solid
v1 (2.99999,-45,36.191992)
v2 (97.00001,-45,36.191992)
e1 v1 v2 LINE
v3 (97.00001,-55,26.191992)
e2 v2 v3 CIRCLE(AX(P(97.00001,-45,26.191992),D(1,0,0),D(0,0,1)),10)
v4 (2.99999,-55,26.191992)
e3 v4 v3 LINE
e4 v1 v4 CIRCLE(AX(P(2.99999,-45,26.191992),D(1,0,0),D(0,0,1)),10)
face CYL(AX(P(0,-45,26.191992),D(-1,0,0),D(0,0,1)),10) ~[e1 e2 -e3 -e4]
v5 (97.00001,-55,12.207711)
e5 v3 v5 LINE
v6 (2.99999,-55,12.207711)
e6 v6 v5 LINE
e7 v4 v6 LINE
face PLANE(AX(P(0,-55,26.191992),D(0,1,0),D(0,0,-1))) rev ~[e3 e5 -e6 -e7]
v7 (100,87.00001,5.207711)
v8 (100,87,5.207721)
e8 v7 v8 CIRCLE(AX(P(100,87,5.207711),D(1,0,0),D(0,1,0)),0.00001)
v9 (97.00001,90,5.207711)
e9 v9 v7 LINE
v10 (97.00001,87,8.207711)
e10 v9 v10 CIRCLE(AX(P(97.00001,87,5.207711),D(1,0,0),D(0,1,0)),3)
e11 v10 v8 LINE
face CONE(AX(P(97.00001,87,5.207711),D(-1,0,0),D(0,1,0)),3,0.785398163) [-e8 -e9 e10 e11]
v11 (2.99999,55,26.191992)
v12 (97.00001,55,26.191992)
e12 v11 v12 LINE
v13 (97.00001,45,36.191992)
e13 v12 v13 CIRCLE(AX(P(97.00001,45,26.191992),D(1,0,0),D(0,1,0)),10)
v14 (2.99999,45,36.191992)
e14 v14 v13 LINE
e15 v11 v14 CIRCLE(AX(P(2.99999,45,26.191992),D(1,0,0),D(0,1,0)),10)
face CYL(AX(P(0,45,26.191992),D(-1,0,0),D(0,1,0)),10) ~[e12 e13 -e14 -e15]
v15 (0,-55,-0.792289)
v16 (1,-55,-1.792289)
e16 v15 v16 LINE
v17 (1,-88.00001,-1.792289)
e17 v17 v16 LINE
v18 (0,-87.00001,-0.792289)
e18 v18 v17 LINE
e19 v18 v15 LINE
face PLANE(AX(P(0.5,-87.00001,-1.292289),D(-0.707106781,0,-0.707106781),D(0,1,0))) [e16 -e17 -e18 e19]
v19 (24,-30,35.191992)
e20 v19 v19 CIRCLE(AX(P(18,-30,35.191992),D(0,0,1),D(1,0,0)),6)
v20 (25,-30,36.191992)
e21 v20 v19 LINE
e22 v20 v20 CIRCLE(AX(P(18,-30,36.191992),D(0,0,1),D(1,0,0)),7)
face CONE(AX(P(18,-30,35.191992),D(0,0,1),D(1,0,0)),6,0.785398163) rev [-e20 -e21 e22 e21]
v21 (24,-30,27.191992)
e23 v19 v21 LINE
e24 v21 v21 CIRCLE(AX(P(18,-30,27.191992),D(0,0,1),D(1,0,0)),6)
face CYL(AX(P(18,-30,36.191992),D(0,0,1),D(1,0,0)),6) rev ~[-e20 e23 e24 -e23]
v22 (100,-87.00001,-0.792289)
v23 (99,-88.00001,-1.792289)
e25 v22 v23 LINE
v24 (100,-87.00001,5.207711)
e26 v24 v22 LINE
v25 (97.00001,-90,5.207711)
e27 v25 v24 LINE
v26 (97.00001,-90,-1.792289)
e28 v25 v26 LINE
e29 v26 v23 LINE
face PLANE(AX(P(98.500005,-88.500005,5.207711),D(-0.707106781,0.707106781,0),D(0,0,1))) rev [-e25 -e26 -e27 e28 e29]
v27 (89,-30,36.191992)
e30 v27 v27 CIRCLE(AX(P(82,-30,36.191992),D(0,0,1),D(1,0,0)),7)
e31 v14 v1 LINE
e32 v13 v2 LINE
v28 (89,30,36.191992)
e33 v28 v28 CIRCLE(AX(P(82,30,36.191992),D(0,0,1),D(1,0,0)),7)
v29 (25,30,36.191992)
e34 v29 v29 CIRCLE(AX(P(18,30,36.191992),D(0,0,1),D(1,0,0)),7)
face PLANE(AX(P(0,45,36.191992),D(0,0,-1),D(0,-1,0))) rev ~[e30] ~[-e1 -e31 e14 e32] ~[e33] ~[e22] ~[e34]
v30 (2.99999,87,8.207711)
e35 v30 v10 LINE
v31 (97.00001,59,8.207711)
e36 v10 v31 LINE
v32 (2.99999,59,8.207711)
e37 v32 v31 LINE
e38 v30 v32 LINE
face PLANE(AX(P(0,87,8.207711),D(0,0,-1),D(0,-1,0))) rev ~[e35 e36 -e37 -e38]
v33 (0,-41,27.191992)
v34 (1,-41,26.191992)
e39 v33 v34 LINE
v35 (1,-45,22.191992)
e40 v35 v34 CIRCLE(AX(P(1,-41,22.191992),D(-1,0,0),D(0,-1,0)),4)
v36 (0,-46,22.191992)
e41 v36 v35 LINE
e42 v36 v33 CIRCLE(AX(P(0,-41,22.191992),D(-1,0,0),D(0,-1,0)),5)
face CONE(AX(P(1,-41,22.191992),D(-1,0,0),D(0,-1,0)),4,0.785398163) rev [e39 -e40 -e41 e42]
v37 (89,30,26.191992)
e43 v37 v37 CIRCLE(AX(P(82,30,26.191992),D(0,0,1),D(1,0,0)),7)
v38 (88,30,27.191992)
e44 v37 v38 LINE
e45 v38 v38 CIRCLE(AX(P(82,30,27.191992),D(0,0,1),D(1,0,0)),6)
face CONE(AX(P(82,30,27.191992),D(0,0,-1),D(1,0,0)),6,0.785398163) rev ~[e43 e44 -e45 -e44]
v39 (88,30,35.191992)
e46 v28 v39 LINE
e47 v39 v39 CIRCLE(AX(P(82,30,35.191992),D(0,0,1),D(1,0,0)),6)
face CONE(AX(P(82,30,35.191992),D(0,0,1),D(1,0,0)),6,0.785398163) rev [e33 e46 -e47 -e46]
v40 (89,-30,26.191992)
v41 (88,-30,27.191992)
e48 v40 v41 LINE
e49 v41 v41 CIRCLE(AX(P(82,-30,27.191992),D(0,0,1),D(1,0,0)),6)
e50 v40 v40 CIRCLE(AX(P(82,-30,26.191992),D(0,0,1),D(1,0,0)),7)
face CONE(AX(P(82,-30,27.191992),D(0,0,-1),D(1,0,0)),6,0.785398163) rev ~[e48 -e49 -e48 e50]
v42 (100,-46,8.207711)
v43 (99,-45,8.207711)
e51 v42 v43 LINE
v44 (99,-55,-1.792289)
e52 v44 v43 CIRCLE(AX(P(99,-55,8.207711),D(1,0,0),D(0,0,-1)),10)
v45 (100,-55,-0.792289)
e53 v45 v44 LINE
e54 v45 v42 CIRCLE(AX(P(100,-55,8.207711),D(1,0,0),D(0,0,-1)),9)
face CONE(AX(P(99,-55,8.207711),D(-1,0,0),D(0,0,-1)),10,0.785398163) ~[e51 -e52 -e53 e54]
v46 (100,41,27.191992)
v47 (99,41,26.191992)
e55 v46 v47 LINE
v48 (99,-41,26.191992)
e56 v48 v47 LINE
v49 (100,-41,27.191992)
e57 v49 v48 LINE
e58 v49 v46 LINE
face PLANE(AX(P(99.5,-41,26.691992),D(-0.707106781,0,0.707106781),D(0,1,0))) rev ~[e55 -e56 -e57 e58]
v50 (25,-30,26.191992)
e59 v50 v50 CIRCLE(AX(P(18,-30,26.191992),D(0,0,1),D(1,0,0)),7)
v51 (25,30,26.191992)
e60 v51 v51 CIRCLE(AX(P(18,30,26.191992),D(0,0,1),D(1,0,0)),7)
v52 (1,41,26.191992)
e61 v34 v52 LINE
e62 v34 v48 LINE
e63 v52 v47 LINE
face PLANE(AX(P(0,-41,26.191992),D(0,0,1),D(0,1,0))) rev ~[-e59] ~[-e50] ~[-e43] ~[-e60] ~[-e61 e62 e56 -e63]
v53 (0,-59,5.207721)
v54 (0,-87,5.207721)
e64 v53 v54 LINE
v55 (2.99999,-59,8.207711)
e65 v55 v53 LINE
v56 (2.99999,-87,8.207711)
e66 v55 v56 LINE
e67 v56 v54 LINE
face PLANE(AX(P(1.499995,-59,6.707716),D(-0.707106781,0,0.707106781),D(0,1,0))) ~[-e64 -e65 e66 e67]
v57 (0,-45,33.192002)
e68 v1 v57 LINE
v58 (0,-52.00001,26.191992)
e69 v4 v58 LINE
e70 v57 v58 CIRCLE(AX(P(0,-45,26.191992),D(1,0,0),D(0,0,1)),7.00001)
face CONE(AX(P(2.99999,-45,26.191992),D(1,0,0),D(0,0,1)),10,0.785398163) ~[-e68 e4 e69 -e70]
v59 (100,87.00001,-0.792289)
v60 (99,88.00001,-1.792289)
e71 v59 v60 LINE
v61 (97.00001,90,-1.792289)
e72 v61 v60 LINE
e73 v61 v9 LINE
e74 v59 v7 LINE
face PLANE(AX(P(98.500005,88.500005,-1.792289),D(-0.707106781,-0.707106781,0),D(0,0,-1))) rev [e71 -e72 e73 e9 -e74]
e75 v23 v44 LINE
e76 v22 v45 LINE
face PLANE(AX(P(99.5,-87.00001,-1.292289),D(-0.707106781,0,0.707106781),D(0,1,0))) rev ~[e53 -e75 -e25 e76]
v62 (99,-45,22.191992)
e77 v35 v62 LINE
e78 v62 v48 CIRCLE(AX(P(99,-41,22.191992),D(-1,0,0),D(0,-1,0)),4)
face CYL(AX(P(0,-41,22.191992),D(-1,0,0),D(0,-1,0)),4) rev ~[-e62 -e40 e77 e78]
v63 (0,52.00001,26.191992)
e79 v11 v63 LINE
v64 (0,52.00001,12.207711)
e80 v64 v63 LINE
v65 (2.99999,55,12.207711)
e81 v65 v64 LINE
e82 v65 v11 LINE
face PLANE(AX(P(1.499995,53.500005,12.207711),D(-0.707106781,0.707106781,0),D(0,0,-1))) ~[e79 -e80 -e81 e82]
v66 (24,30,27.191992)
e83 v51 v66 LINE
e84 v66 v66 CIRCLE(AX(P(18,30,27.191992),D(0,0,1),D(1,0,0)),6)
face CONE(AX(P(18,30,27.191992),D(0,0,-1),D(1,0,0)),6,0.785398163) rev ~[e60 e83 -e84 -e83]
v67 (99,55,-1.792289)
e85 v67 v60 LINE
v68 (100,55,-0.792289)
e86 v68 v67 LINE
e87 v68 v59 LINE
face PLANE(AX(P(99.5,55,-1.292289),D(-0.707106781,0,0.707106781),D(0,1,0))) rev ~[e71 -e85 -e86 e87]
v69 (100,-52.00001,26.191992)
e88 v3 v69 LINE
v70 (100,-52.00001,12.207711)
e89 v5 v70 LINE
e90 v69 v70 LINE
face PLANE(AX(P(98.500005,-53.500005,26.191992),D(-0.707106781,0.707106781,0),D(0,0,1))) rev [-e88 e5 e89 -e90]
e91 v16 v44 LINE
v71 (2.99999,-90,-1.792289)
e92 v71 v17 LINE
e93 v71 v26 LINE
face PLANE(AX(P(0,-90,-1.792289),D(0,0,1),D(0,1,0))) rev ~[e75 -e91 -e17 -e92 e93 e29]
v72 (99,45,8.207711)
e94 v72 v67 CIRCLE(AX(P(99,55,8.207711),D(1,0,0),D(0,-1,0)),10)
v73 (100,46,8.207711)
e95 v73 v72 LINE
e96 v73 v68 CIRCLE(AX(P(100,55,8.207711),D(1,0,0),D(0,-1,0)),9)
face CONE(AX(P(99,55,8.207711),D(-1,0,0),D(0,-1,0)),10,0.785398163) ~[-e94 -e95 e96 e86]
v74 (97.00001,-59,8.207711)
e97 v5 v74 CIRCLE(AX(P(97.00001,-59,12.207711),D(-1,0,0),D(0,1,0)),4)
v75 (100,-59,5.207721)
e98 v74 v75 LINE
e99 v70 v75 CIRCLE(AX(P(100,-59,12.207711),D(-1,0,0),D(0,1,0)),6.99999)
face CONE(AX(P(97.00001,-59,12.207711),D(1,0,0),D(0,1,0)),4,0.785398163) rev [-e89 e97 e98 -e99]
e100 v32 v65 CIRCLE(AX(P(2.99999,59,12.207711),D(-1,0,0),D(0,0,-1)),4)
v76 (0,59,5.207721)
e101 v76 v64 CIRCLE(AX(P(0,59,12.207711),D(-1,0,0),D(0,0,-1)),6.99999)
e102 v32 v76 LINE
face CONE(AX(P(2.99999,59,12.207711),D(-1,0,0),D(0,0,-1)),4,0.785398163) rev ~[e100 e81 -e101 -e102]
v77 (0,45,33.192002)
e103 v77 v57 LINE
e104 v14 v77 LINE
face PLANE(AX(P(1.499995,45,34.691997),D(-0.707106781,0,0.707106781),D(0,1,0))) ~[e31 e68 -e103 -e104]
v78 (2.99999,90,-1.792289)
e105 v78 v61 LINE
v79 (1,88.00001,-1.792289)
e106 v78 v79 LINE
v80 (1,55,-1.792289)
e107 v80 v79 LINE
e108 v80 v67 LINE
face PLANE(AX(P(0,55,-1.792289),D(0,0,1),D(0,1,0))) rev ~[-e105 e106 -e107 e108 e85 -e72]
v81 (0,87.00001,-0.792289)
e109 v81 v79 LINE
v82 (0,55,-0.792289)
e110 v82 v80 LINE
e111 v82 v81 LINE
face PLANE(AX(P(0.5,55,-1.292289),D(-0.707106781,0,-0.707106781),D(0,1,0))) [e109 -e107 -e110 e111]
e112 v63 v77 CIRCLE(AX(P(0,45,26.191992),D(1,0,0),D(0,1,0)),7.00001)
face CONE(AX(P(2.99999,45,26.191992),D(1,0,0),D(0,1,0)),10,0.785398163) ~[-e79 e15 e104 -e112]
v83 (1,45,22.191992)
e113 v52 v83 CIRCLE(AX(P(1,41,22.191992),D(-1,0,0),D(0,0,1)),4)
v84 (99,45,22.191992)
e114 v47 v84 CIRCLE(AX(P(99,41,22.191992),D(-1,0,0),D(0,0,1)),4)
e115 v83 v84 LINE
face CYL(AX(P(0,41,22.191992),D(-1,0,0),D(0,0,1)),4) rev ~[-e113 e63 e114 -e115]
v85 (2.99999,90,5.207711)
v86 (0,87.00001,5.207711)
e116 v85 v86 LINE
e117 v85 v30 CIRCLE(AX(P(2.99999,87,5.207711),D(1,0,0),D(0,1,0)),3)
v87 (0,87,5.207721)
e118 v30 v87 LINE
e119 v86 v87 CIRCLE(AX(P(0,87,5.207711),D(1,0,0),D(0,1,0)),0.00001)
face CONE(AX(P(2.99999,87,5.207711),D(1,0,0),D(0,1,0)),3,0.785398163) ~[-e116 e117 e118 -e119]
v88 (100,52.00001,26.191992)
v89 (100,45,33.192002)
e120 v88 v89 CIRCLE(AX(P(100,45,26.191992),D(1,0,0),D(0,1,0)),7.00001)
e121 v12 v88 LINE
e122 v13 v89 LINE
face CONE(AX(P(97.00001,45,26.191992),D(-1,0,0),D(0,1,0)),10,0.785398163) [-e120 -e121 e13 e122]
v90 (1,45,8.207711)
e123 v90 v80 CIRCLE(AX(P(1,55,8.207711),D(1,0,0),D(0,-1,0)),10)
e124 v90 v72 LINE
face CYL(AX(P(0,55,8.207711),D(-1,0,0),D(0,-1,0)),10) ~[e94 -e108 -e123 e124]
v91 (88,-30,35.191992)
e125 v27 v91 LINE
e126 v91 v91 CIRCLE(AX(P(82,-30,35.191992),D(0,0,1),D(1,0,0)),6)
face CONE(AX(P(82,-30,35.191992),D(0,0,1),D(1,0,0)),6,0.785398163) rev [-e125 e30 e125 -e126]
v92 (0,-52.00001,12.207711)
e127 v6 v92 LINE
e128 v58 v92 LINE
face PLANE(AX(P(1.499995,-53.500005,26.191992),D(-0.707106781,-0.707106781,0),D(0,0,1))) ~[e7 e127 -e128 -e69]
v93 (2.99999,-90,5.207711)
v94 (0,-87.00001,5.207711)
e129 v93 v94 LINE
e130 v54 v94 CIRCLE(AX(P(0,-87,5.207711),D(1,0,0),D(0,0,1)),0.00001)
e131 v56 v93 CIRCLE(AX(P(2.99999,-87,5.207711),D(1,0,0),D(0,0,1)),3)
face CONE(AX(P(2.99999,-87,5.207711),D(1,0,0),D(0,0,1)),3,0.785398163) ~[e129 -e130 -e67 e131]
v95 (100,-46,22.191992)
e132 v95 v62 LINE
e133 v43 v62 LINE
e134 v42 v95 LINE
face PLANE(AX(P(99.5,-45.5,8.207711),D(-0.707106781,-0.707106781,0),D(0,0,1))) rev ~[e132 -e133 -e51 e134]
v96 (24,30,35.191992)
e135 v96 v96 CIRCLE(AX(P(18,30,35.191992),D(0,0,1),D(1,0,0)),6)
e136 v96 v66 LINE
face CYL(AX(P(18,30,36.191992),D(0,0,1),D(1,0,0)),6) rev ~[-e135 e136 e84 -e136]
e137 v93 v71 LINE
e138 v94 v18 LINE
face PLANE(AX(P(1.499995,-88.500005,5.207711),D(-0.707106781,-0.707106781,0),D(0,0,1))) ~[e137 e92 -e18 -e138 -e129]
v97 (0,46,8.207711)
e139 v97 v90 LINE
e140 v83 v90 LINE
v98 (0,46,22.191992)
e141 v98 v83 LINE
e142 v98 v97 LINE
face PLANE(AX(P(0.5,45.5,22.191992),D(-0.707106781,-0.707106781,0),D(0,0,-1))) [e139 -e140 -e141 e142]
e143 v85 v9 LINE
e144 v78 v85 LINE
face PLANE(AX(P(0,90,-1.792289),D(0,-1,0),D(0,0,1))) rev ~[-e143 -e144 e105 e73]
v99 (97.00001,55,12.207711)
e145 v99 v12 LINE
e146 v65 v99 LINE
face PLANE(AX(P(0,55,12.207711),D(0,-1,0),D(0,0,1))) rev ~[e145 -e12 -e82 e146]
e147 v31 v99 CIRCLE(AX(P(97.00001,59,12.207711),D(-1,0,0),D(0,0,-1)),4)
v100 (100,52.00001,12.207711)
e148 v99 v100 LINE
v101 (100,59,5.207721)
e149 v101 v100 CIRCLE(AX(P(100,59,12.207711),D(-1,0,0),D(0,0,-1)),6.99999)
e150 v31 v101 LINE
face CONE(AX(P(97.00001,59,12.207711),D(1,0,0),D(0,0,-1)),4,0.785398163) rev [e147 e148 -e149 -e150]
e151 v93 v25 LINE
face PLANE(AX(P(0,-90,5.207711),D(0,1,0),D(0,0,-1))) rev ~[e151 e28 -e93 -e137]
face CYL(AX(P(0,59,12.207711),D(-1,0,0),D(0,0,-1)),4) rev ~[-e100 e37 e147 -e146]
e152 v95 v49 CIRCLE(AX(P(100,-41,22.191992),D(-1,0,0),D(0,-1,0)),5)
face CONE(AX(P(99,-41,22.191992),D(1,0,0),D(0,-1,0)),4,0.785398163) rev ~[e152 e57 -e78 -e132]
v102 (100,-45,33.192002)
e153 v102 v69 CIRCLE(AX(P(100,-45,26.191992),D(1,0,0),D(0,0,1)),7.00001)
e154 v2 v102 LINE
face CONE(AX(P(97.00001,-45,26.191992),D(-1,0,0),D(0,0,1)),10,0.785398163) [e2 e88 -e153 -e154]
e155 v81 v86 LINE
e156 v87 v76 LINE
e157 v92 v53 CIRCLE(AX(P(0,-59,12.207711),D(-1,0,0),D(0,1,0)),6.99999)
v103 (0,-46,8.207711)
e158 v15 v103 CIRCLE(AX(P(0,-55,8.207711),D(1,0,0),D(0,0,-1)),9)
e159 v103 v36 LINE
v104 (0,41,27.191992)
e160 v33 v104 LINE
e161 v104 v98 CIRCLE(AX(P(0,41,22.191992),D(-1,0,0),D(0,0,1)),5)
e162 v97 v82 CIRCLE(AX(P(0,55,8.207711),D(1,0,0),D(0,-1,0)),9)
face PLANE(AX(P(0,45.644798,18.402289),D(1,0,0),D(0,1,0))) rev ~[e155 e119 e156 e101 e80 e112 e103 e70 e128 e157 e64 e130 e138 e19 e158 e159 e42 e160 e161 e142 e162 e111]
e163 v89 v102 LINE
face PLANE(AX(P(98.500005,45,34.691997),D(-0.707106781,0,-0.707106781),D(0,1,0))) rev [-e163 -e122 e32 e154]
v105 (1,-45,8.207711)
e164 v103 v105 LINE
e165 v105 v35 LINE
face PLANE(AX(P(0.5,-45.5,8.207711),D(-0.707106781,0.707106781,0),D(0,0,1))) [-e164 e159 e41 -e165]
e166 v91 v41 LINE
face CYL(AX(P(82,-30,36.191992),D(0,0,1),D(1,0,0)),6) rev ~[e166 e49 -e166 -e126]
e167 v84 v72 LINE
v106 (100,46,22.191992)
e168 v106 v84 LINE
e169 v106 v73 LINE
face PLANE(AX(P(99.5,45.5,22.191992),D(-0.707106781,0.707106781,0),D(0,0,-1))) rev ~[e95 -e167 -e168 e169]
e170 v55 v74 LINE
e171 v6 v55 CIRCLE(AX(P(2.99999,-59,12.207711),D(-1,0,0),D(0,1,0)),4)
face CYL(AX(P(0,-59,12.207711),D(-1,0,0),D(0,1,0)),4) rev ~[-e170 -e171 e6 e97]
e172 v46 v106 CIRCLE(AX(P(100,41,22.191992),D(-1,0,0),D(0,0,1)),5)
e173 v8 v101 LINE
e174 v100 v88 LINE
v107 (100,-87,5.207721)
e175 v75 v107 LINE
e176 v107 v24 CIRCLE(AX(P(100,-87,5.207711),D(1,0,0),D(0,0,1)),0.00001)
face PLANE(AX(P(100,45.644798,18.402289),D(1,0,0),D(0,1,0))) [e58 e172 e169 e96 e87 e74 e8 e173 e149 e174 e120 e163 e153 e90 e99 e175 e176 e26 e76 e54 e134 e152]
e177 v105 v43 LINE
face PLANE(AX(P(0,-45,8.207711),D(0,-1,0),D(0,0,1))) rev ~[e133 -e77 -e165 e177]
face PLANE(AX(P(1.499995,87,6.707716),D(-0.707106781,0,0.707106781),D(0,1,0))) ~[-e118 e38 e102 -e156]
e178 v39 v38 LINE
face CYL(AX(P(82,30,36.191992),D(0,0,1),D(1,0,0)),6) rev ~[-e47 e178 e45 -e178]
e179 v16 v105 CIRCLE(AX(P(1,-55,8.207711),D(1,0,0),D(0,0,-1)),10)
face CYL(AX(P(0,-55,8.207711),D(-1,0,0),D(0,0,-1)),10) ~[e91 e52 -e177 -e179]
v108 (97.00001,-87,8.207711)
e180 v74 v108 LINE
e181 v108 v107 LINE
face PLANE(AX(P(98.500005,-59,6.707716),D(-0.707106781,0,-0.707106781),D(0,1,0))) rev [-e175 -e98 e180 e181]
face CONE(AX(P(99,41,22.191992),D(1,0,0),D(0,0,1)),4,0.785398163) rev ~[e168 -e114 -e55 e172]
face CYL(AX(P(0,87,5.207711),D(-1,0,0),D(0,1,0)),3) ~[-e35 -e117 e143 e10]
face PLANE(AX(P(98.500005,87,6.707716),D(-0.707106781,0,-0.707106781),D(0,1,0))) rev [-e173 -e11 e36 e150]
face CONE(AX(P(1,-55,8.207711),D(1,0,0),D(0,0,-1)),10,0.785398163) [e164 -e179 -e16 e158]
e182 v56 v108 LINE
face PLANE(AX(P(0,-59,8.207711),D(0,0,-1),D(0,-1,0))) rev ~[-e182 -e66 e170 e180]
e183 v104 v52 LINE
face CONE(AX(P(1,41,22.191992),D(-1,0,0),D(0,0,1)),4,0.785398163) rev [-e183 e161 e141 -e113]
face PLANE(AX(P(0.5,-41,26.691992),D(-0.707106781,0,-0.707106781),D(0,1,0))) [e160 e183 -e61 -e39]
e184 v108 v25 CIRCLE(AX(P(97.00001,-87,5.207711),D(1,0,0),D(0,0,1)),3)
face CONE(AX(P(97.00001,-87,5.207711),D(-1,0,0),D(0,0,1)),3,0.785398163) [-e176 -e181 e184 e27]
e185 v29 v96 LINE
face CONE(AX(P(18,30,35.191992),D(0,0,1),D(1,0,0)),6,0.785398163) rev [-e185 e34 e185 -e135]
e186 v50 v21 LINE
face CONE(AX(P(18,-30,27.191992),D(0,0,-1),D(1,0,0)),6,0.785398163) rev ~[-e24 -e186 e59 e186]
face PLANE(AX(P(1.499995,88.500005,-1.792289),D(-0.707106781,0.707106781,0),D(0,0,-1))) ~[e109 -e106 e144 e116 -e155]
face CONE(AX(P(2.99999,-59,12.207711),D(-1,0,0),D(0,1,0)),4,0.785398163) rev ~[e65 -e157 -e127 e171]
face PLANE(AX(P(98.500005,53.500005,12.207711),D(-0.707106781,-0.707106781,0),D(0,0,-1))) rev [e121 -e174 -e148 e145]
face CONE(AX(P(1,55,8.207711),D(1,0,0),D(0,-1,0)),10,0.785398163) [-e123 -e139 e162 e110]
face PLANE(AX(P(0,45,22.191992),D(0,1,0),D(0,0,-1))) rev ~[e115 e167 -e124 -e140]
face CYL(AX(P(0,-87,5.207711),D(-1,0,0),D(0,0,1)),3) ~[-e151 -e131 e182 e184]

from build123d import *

# Parameters (mm, degrees)
F1_DEPTH = 100
F2_SIZE  = 2.99999
F3_SIZE  = 1
F4_R     = 6
F5_DEPTH = 10
F6_SIZE  = 1


# Not quite as in the source:
# - a fillet or chamfer is up to 0.001 mm smaller than in the source, because OpenCascade refuses the exact size


with BuildPart() as f1:
    # F0 (on Right) → F1 (new body)
    with BuildSketch(Plane.YZ):
        with BuildLine():
            Line((45, 36.1919924617), (0, 36.1919924617))
            Line((0, 36.1919924617), (0, 26.1919924617))
            Line((0, 26.1919924617), (41, 26.1919924617))
            ThreePointArc((41, 26.1919924617), (43.8284271247, 25.0204195864), (45, 22.1919924617))
            Line((45, 22.1919924617), (45, 8.2077106759))
            ThreePointArc((45, 8.2077106759), (47.9289321881, 1.136642864), (55, -1.7922893241))
            Line((55, -1.7922893241), (90, -1.7922893241))
            Line((90, -1.7922893241), (90, 5.2077106759))
            ThreePointArc((90, 5.2077106759), (89.1213203436, 7.3290310195), (87, 8.2077106759))
            Line((87, 8.2077106759), (59, 8.2077106759))
            ThreePointArc((59, 8.2077106759), (56.1715728753, 9.3792835511), (55, 12.2077106759))
            Line((55, 12.2077106759), (55, 26.1919924617))
            ThreePointArc((55, 26.1919924617), (52.0710678119, 33.2630602735), (45, 36.1919924617))
        make_face()
        with BuildLine():
            Line((0, 26.1919924617), (0, 36.1919924617))
            Line((0, 36.1919924617), (-45, 36.1919924617))
            ThreePointArc((-45, 36.1919924617), (-52.0710678119, 33.2630602735), (-55, 26.1919924617))
            Line((-55, 26.1919924617), (-55, 12.2077106759))
            ThreePointArc((-55, 12.2077106759), (-56.1715728753, 9.3792835511), (-59, 8.2077106759))
            Line((-59, 8.2077106759), (-87, 8.2077106759))
            ThreePointArc((-87, 8.2077106759), (-89.1213203436, 7.3290310195), (-90, 5.2077106759))
            Line((-90, 5.2077106759), (-90, -1.7922893241))
            Line((-90, -1.7922893241), (-55, -1.7922893241))
            ThreePointArc((-55, -1.7922893241), (-47.9289321881, 1.136642864), (-45, 8.2077106759))
            Line((-45, 8.2077106759), (-45, 22.1919924617))
            ThreePointArc((-45, 22.1919924617), (-43.8284271247, 25.0204195864), (-41, 26.1919924617))
            Line((-41, 26.1919924617), (0, 26.1919924617))
        make_face()
    extrude(amount=F1_DEPTH)

    # F2 (size 3 in the source; OpenCascade refuses exactly that, so slightly less here)
    f2_edges = [f1.edges().sort_by_distance(p)[0] for p in [
        (0, -90, 1.707711),
        (0, -89.12132, 7.329031),
        (0, -73, 8.207711),
        (0, -56.171573, 9.379284),
        (0, -55, 19.199852),
        (0, -52.071068, 33.26306),
        (0, 0, 36.191992),
        (0, 52.071068, 33.26306),
        (100, 0, 36.191992),
    ]]
    chamfer(f2_edges, length=F2_SIZE)

    # F3
    f3_edges = [f1.edges().sort_by_distance(p)[0] for p in [
        (100, 0, 26.191992),
        (0, 0, 26.191992),
    ]]
    chamfer(f3_edges, length=F3_SIZE)

    # F4 (on face) → F5 (cut)
    with BuildSketch(Plane.XY.offset(36.1919924617)):
        with Locations((18, -30)):
            Circle(F4_R)
        with Locations((82, -30)):
            Circle(F4_R)
        with Locations((82, 30)):
            Circle(F4_R)
        with Locations((18, 30)):
            Circle(F4_R)
    extrude(amount=-F5_DEPTH, mode=Mode.SUBTRACT)

    # F6
    f6_edges = [f1.edges().sort_by_distance(p)[0] for p in [
        (12, 30, 36.191992),
        (76, 30, 36.191992),
        (88, -30, 31.191992),
        (76, -30, 36.191992),
        (76, -30, 26.191992),
        (12, -30, 36.191992),
        (76, 30, 26.191992),
        (12, 30, 26.191992),
        (12, -30, 26.191992),
    ]]
    chamfer(f6_edges, length=F6_SIZE)


solid = f1.part
